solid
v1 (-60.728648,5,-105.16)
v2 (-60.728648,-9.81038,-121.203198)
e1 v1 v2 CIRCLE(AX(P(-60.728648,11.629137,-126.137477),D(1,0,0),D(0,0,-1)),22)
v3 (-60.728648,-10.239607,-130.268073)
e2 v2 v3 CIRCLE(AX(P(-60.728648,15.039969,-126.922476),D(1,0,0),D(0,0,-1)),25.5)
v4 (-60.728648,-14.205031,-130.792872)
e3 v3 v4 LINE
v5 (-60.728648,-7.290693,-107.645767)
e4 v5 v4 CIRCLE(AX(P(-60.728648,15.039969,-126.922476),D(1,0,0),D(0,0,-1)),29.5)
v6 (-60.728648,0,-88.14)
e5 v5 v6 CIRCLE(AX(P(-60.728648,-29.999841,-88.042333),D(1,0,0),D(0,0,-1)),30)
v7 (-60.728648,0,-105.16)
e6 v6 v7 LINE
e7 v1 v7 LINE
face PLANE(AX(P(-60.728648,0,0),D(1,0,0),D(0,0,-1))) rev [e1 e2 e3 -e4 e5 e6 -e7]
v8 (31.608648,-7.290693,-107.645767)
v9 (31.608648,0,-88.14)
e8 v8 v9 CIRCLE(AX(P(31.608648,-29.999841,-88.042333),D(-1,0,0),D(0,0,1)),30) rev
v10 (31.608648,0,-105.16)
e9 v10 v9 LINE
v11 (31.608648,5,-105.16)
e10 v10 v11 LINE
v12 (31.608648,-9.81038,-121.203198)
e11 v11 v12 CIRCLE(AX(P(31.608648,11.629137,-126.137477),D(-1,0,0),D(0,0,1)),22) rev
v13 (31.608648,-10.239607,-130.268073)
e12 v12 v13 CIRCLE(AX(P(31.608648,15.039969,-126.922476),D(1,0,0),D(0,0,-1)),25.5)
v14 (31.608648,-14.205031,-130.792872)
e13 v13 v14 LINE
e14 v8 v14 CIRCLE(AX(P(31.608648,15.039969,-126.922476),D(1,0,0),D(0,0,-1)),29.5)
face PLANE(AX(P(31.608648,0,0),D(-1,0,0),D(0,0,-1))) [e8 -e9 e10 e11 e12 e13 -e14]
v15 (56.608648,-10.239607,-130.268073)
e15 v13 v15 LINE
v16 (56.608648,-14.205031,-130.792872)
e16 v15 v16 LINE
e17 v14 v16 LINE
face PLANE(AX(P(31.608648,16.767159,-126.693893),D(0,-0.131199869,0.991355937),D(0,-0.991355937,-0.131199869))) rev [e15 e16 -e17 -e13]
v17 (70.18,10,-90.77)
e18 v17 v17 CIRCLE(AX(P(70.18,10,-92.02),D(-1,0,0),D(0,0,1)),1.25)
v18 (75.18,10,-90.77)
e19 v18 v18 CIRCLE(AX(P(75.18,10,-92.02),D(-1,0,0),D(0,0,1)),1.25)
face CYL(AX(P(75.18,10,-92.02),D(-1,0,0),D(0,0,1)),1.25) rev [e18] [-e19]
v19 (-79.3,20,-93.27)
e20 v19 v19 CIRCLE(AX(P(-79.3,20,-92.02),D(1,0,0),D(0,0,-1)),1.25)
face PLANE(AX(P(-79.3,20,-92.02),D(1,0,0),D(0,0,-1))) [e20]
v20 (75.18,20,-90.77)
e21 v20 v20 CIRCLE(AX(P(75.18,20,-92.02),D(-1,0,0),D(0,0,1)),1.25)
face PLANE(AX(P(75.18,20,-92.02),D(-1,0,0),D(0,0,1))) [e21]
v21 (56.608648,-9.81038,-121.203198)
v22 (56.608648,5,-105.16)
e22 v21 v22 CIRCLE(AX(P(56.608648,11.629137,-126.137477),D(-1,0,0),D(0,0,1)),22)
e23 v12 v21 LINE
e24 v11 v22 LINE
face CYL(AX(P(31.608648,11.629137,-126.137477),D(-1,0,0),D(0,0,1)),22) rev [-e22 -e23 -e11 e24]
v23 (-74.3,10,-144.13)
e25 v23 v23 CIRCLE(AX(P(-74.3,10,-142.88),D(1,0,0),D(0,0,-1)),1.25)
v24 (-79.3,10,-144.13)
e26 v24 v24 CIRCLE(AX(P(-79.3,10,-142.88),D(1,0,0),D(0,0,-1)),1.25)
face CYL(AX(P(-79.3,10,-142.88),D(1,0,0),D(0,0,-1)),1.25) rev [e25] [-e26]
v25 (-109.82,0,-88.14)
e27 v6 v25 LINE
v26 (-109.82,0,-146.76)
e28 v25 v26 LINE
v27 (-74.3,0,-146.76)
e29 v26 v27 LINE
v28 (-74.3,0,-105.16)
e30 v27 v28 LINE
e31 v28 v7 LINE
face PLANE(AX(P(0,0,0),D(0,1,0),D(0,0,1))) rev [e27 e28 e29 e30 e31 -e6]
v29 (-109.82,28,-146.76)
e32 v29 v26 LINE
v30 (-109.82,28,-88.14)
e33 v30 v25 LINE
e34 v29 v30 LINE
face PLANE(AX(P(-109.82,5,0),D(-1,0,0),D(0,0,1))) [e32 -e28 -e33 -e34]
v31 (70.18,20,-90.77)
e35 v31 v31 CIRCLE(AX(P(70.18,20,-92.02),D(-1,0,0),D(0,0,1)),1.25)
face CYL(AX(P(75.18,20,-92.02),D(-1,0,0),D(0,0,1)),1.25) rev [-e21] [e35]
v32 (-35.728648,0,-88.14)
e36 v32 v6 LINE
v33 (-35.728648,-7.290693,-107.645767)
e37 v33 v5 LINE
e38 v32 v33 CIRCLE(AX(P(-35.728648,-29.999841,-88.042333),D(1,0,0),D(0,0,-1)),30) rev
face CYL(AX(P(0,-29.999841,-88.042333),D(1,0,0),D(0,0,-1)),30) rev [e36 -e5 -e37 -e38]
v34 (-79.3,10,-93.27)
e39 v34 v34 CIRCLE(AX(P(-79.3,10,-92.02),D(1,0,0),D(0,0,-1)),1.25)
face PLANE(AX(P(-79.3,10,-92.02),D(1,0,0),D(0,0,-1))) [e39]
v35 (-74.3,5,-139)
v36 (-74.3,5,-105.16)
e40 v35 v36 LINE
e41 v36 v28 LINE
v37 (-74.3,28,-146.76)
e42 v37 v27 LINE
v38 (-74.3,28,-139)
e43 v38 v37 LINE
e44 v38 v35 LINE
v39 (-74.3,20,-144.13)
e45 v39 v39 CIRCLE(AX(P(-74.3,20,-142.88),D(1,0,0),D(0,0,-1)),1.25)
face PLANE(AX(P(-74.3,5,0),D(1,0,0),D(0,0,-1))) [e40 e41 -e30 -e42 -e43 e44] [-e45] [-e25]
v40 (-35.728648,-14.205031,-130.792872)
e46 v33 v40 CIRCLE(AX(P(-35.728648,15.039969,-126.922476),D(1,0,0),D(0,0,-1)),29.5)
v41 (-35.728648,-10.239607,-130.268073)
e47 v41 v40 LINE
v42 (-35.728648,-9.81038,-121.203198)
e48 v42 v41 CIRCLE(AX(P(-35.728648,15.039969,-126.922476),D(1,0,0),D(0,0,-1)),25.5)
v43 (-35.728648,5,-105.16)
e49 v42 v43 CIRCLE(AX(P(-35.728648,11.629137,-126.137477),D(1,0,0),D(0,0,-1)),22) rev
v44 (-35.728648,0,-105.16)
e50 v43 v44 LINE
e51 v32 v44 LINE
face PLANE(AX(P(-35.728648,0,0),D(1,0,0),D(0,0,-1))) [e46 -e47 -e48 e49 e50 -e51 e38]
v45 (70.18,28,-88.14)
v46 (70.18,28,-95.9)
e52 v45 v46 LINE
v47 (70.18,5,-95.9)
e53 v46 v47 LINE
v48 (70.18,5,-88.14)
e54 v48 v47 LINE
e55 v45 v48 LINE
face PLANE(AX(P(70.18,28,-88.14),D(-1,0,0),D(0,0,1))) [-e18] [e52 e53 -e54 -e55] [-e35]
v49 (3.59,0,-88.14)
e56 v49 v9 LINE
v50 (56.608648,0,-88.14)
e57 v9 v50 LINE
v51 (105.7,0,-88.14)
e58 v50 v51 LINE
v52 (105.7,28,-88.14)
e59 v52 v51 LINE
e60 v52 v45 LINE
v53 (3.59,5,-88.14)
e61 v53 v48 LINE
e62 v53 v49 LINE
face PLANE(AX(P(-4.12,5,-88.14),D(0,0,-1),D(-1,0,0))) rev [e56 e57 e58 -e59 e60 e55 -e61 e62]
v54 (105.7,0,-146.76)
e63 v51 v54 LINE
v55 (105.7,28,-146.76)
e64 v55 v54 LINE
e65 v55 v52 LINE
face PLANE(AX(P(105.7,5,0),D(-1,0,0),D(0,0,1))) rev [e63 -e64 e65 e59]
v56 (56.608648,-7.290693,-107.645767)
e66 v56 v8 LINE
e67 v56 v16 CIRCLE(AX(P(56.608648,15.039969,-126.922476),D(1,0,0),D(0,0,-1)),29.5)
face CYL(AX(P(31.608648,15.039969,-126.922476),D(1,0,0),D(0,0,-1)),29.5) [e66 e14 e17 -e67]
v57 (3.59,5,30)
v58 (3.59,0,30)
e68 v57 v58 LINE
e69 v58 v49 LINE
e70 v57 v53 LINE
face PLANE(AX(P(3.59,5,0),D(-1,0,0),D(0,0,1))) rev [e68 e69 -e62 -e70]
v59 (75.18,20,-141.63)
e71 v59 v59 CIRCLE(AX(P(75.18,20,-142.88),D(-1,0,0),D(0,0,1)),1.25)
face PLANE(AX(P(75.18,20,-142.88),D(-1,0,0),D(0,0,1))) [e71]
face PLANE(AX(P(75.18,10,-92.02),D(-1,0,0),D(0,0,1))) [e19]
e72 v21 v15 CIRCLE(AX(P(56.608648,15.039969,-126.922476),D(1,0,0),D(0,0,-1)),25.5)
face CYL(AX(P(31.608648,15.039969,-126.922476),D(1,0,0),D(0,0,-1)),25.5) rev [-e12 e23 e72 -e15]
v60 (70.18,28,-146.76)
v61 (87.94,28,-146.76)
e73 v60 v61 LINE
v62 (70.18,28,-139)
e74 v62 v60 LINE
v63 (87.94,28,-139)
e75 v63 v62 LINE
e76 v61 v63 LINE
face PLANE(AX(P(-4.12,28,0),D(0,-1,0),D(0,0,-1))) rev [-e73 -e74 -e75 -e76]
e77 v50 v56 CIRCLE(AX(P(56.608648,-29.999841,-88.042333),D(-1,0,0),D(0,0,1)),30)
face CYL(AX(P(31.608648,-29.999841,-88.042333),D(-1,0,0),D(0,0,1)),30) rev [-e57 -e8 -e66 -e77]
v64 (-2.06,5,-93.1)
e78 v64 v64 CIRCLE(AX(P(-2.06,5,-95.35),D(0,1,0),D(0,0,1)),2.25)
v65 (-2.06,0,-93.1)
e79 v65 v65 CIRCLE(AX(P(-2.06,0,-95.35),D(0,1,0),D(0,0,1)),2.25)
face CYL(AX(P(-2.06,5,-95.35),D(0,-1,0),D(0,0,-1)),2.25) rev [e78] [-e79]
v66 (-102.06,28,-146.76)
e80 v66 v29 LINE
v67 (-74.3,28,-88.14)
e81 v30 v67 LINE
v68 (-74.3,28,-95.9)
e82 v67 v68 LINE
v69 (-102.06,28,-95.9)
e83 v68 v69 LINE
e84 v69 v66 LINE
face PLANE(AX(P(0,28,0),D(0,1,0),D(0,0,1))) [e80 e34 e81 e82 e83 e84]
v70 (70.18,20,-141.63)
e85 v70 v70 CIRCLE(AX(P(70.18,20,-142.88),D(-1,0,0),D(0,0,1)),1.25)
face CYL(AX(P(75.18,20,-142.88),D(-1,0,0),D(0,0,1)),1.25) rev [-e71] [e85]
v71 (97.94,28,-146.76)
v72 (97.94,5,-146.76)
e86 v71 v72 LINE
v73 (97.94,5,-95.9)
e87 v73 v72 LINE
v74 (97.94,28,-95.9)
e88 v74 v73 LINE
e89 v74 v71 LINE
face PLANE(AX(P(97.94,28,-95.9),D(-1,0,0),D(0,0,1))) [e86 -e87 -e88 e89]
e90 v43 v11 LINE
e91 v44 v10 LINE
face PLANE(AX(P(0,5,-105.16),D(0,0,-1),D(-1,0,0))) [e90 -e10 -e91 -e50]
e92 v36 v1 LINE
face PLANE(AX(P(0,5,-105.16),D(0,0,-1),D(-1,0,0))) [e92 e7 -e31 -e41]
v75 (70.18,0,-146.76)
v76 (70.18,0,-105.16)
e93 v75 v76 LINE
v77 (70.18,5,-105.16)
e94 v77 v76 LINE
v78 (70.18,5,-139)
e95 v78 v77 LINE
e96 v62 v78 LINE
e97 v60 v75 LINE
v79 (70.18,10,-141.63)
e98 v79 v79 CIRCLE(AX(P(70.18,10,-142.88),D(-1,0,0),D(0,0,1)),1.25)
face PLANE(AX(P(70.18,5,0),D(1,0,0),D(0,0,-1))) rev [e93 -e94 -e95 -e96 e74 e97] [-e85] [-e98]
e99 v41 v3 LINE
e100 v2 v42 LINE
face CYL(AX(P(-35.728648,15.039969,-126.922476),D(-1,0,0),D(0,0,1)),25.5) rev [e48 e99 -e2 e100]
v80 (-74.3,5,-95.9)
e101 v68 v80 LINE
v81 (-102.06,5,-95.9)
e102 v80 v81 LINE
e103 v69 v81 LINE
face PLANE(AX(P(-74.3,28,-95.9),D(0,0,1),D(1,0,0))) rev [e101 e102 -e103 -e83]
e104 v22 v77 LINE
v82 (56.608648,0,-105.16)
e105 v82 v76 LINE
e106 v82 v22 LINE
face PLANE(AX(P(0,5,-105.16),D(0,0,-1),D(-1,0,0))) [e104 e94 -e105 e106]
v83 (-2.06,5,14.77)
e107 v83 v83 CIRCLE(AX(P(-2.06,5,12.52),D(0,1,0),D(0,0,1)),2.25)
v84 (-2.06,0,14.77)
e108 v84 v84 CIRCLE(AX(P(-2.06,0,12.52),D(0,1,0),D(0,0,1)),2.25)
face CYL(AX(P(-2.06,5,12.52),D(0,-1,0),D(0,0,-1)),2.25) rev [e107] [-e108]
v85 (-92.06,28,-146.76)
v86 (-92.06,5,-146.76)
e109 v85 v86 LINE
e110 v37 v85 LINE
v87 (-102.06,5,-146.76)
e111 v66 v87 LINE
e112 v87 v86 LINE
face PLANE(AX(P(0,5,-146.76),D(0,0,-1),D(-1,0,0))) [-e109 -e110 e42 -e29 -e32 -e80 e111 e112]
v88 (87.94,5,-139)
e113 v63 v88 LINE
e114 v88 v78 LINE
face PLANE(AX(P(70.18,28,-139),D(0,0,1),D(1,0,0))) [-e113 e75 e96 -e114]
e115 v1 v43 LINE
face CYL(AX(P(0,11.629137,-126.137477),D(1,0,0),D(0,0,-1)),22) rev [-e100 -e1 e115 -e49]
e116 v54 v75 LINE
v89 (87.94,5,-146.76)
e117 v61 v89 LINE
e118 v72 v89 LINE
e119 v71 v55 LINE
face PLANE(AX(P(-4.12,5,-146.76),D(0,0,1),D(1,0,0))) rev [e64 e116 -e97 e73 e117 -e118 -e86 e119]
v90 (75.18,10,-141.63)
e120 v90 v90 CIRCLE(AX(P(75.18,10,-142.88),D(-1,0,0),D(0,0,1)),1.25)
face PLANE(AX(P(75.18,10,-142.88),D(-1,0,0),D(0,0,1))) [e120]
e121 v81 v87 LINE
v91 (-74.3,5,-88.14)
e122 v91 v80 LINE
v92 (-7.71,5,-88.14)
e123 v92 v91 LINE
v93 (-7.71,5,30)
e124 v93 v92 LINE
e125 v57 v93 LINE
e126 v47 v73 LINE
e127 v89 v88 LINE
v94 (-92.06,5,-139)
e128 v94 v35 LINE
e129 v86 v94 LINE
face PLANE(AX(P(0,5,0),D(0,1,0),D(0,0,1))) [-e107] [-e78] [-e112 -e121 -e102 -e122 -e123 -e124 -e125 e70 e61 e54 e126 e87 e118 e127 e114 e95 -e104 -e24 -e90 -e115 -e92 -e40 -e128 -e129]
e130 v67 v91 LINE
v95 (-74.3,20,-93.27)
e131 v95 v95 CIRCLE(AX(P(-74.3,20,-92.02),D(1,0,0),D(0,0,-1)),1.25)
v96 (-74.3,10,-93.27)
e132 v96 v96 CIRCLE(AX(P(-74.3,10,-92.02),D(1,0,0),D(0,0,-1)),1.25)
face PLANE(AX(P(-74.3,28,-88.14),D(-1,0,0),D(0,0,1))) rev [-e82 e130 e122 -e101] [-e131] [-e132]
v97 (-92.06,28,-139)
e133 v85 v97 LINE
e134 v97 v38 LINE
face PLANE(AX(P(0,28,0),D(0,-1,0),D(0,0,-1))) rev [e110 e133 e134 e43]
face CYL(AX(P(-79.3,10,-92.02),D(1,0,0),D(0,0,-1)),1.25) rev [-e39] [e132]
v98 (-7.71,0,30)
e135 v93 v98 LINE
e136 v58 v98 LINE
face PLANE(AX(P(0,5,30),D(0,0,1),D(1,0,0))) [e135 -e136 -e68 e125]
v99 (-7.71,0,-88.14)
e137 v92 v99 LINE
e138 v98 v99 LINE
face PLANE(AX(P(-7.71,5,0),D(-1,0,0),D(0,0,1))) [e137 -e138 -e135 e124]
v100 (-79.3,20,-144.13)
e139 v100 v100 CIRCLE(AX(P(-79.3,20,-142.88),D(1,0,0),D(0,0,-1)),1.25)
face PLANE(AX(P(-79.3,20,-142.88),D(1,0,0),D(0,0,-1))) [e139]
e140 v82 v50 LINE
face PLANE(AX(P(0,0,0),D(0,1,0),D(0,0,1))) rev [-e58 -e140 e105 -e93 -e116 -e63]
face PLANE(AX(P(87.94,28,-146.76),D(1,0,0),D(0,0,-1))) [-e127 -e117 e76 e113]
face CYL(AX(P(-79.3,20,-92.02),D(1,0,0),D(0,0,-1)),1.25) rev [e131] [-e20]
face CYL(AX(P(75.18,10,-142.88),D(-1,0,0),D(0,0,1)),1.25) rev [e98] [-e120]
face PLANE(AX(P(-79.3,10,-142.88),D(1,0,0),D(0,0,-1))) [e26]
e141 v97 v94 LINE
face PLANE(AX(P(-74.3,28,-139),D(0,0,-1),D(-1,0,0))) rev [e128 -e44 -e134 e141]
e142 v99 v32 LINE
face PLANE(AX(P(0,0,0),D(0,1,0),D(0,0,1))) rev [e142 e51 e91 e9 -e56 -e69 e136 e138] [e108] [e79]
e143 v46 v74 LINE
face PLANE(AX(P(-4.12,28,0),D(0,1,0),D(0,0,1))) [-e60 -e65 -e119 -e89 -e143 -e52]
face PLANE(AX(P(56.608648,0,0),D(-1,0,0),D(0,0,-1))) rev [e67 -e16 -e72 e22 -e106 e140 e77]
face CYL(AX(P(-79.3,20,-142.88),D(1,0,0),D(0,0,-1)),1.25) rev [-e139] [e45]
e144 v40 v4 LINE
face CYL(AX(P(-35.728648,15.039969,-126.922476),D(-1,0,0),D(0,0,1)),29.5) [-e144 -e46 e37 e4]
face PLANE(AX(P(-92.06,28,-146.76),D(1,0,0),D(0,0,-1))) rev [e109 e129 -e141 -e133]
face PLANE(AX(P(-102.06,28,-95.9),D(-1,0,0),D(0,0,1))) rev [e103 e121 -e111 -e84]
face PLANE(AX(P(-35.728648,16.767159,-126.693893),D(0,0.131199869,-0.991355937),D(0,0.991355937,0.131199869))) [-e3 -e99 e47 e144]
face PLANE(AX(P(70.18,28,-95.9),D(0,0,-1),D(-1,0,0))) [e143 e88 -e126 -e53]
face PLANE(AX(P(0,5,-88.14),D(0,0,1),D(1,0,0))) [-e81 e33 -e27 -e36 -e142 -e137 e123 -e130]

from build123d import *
from build123d.topology import SkipClean

# Parameters (mm, degrees)
BOSS_EXTRUDE1_DEPTH = 5
SKETCH7_W           = 17.76
SKETCH7_H           = 7.76
BOSS_EXTRUDE2_DEPTH = 23
SKETCH8_R           = 1.25
CUT_EXTRUDE1_DEPTH  = 5
CUT_EXTRUDE2_START  = -5
SKETCH9_R           = 1.25
CUT_EXTRUDE2_DEPTH  = 5
BOSS_EXTRUDE3_DEPTH = 25
FILLET1_R           = 22
FILLET2_R           = 30


with BuildPart() as part:
    # Sketch5 → Boss-Extrude1 (new body)
    with BuildSketch(Plane(origin=(0, 0, 0), x_dir=(1, 0, 0), z_dir=(0, 1, 0))):
        with BuildLine():
            Line((-7.71, 88.14), (-7.71, -30))
            Line((-7.71, -30), (-2.06, -30))
            Line((-2.06, -30), (-2.06, -14.77))
            ThreePointArc((-2.06, -14.77), (-4.31, -12.52), (-2.06, -10.27))
            Line((-2.06, -10.27), (-2.06, 93.1))
            ThreePointArc((-2.06, 93.1), (-4.31, 95.35), (-2.06, 97.6))
            Line((-2.06, 97.6), (-2.06, 105.16))
            Line((-2.06, 105.16), (-74.3, 105.16))
            Line((-74.3, 105.16), (-74.3, 146.76))
            Line((-74.3, 146.76), (-109.82, 146.76))
            Line((-109.82, 146.76), (-109.82, 88.14))
            Line((-109.82, 88.14), (-7.71, 88.14))
        make_face()
    boss_extrude1 = extrude(amount=BOSS_EXTRUDE1_DEPTH)

    # Sketch7 → Boss-Extrude2 (add)
    with BuildSketch(Plane(origin=(0, 5, 0), x_dir=(1, 0, 0), z_dir=(0, 1, 0))):
        Polygon((-109.82, 146.76), (-109.82, 88.14), (-74.3, 88.14), (-74.3, 95.9), (-102.06, 95.9), (-102.06, 146.76), align=None)
        with Locations((-83.18, 142.88)):
            Rectangle(SKETCH7_W, SKETCH7_H)
    boss_extrude2 = extrude(amount=BOSS_EXTRUDE2_DEPTH)

    # Sketch8 → Cut-Extrude1 (cut)
    with BuildSketch(Plane(origin=(-74.3, 0, 0), x_dir=(0, 0, -1), z_dir=(1, 0, 0))):
        with Locations((92.02, 10)):
            Circle(SKETCH8_R)
        with Locations((92.02, 20)):
            Circle(SKETCH8_R)
        with Locations((142.88, 10)):
            Circle(SKETCH8_R)
        with Locations((142.88, 20)):
            Circle(SKETCH8_R)
    extrude(amount=-CUT_EXTRUDE1_DEPTH, mode=Mode.SUBTRACT)

    # Mirror2: Boss-Extrude1, Boss-Extrude2 across plane
    with SkipClean():  # the faces are left unmerged after this step: merging them gives an invalid solid
        add(boss_extrude1.mirror(Plane(origin=(-2.06, 5, 0), x_dir=(0, 0, 1), z_dir=(1, 0, 0))))
        add(boss_extrude2.mirror(Plane(origin=(-2.06, 5, 0), x_dir=(0, 0, 1), z_dir=(1, 0, 0))))

    # Sketch9 → Cut-Extrude2 (cut)
    with SkipClean():  # the faces are left unmerged after this step: merging them gives an invalid solid
        with BuildSketch(Plane.ZY.offset(-70.18).offset(CUT_EXTRUDE2_START)):
            with Locations(Location((-142.88, 10, 0), (0, 0, 180))):
                Circle(SKETCH9_R)
            with Locations(Location((-142.88, 20, 0), (0, 0, 180))):
                Circle(SKETCH9_R)
            with Locations(Location((-92.02, 10, 0), (0, 0, 180))):
                Circle(SKETCH9_R)
            with Locations(Location((-92.02, 20, 0), (0, 0, 180))):
                Circle(SKETCH9_R)
        extrude(amount=CUT_EXTRUDE2_DEPTH, mode=Mode.SUBTRACT)

    # Sketch12 → Boss-Extrude3 (add)
    with SkipClean():  # the faces are left unmerged after this step: merging them gives an invalid solid
        with BuildSketch(Plane(origin=(-60.728648392, 0, 0), x_dir=(0, 0, -1), z_dir=(1, 0, 0))):
            with BuildLine():
                Line((130.792872119, -14.205030824), (130.268072642, -10.239607075))
                ThreePointArc((130.268072642, -10.239607075), (114.312520733, -7.123943435), (103.482147137, 5))
                Line((103.482147137, 5), (99.183531943, 5))
                ThreePointArc((99.183531943, 5), (111.604669447, -10.171432922), (130.792872119, -14.205030824))
            make_face()
        boss_extrude3 = extrude(amount=BOSS_EXTRUDE3_DEPTH)

    # Mirror3: Boss-Extrude3 across plane
    with SkipClean():  # the faces are left unmerged after this step: merging them gives an invalid solid
        add(boss_extrude3.mirror(Plane(origin=(-2.06, 0, 0), x_dir=(0, 0, 1), z_dir=(1, 0, 0))))

    # Fillet1
    # the kernel refuses this fillet: 22 mm, written as the material it adds along each edge
    with BuildSketch(Plane(origin=(-35.728648392, 1.749196605, -105.16), x_dir=(0, 1, 0), z_dir=(-1, 0, 0))) as fillet1_piece_1:
        with BuildLine():
            CenterArc((9.879940472, 20.977477008), FILLET1_R, 192.960861786, 59.501970429)
            Line((-11.559576515, 16.043197795), (-11.988366855, 15.94451221))
            ThreePointArc((-11.988366855, 15.94451221), (-7.755155531, 6.598291061), (-0.22933098, -0.375509389))
            Line((-0.22933098, -0.375509389), (0, -0.44))
            ThreePointArc((0, -0.44), (1.625401698, -0.44), (3.118220654, -0.41954954))
            Line((3.118220654, -0.41954954), (3.250803395, 0))
        make_face()
    extrude(amount=25)
    with BuildSketch(Plane(origin=(31.608648392, 1.749196605, -105.16), x_dir=(0, 1, 0), z_dir=(1, 0, 0))) as fillet1_piece_2:
        with BuildLine():
            CenterArc((9.879940472, -20.977477008), FILLET1_R, 107.537167785, 59.501970429)
            Line((-11.559576515, -16.043197795), (-11.988366855, -15.94451221))
            ThreePointArc((-11.988366855, -15.94451221), (-7.755155531, -6.598291061), (-0.22933098, 0.375509389))
            Line((-0.22933098, 0.375509389), (0, 0.44))
            ThreePointArc((0, 0.44), (1.625401698, 0.44), (3.118220654, 0.41954954))
            Line((3.118220654, 0.41954954), (3.250803395, 0))
        make_face()
    extrude(amount=25)

    # Fillet2
    # the kernel refuses this fillet: 30 mm, written as the material it adds along each edge
    with BuildSketch(Plane(origin=(-1.974069594, 0, -101.544349118), x_dir=(0, 0, 1), z_dir=(-1, 0, 0))) as fillet2_piece_1_section:
        with BuildLine():
            CenterArc((13.501831519, -30), FILLET2_R, 90, 40.801822192)
            ThreePointArc((-6.101508838, -7.290771769), (-2.755120907, -3.892795973), (0, 0))
            Line((0, 0), (13.501831519, 0))
        make_face()
    fillet2_piece_1 = extrude(amount=58.754578797, mode=Mode.PRIVATE)
    fillet2_piece_1 = split(fillet2_piece_1, bisect_by=Plane(origin=(-4.842034797, 0.299973601, -88.14), z_dir=(0, 0, 1)), keep=Keep.TOP, mode=Mode.PRIVATE)
    fillet2_piece_1 = split(fillet2_piece_1, bisect_by=Plane(origin=(-7.71, 0.299973601, -88.091260944), z_dir=(1, 0, 0)), keep=Keep.TOP, mode=Mode.PRIVATE)
    add(fillet2_piece_1)
    with BuildSketch(Plane(origin=(-35.728648392, 0, -101.544349118), x_dir=(0, 0, 1), z_dir=(-1, 0, 0))) as fillet2_piece_2_section:
        with BuildLine():
            CenterArc((13.501831519, -30), FILLET2_R, 90, 40.801822192)
            ThreePointArc((-6.101508838, -7.290771769), (-2.755120907, -3.892795973), (0, 0))
            Line((0, 0), (13.501831519, 0))
        make_face()
    fillet2_piece_2 = extrude(amount=25, mode=Mode.PRIVATE)
    fillet2_piece_2 = split(fillet2_piece_2, bisect_by=Plane(origin=(-48.228648392, -1.487894786, -88.14), z_dir=(0, 0, -1)), keep=Keep.TOP, mode=Mode.PRIVATE)
    add(fillet2_piece_2)
    with BuildSketch(Plane(origin=(-2.145930406, 0, -101.544349118), x_dir=(0, 0, 1), z_dir=(1, 0, 0))) as fillet2_piece_3_section:
        with BuildLine():
            CenterArc((13.501831519, 30), FILLET2_R, 229.198177808, 40.801822192)
            ThreePointArc((-6.101508838, 7.290771769), (-2.755120907, 3.892795973), (0, 0))
            Line((0, 0), (13.501831519, 0))
        make_face()
    fillet2_piece_3 = extrude(amount=58.754578797, mode=Mode.PRIVATE)
    fillet2_piece_3 = split(fillet2_piece_3, bisect_by=Plane(origin=(3.59, 0.299973601, -88.091260944), z_dir=(-1, 0, 0)), keep=Keep.TOP, mode=Mode.PRIVATE)
    fillet2_piece_3 = split(fillet2_piece_3, bisect_by=Plane(origin=(0.722034797, 0.299973601, -88.14), z_dir=(0, 0, 1)), keep=Keep.TOP, mode=Mode.PRIVATE)
    add(fillet2_piece_3)
    with BuildSketch(Plane(origin=(31.608648392, 0, -101.544349118), x_dir=(0, 0, 1), z_dir=(1, 0, 0))) as fillet2_piece_4_section:
        with BuildLine():
            CenterArc((13.501831519, 30), FILLET2_R, 229.198177808, 40.801822192)
            ThreePointArc((-6.101508838, 7.290771769), (-2.755120907, 3.892795973), (0, 0))
            Line((0, 0), (13.501831519, 0))
        make_face()
    fillet2_piece_4 = extrude(amount=25, mode=Mode.PRIVATE)
    fillet2_piece_4 = split(fillet2_piece_4, bisect_by=Plane(origin=(44.108648392, -1.487894786, -88.14), z_dir=(0, 0, -1)), keep=Keep.TOP, mode=Mode.PRIVATE)
    add(fillet2_piece_4)


solid = part.part
